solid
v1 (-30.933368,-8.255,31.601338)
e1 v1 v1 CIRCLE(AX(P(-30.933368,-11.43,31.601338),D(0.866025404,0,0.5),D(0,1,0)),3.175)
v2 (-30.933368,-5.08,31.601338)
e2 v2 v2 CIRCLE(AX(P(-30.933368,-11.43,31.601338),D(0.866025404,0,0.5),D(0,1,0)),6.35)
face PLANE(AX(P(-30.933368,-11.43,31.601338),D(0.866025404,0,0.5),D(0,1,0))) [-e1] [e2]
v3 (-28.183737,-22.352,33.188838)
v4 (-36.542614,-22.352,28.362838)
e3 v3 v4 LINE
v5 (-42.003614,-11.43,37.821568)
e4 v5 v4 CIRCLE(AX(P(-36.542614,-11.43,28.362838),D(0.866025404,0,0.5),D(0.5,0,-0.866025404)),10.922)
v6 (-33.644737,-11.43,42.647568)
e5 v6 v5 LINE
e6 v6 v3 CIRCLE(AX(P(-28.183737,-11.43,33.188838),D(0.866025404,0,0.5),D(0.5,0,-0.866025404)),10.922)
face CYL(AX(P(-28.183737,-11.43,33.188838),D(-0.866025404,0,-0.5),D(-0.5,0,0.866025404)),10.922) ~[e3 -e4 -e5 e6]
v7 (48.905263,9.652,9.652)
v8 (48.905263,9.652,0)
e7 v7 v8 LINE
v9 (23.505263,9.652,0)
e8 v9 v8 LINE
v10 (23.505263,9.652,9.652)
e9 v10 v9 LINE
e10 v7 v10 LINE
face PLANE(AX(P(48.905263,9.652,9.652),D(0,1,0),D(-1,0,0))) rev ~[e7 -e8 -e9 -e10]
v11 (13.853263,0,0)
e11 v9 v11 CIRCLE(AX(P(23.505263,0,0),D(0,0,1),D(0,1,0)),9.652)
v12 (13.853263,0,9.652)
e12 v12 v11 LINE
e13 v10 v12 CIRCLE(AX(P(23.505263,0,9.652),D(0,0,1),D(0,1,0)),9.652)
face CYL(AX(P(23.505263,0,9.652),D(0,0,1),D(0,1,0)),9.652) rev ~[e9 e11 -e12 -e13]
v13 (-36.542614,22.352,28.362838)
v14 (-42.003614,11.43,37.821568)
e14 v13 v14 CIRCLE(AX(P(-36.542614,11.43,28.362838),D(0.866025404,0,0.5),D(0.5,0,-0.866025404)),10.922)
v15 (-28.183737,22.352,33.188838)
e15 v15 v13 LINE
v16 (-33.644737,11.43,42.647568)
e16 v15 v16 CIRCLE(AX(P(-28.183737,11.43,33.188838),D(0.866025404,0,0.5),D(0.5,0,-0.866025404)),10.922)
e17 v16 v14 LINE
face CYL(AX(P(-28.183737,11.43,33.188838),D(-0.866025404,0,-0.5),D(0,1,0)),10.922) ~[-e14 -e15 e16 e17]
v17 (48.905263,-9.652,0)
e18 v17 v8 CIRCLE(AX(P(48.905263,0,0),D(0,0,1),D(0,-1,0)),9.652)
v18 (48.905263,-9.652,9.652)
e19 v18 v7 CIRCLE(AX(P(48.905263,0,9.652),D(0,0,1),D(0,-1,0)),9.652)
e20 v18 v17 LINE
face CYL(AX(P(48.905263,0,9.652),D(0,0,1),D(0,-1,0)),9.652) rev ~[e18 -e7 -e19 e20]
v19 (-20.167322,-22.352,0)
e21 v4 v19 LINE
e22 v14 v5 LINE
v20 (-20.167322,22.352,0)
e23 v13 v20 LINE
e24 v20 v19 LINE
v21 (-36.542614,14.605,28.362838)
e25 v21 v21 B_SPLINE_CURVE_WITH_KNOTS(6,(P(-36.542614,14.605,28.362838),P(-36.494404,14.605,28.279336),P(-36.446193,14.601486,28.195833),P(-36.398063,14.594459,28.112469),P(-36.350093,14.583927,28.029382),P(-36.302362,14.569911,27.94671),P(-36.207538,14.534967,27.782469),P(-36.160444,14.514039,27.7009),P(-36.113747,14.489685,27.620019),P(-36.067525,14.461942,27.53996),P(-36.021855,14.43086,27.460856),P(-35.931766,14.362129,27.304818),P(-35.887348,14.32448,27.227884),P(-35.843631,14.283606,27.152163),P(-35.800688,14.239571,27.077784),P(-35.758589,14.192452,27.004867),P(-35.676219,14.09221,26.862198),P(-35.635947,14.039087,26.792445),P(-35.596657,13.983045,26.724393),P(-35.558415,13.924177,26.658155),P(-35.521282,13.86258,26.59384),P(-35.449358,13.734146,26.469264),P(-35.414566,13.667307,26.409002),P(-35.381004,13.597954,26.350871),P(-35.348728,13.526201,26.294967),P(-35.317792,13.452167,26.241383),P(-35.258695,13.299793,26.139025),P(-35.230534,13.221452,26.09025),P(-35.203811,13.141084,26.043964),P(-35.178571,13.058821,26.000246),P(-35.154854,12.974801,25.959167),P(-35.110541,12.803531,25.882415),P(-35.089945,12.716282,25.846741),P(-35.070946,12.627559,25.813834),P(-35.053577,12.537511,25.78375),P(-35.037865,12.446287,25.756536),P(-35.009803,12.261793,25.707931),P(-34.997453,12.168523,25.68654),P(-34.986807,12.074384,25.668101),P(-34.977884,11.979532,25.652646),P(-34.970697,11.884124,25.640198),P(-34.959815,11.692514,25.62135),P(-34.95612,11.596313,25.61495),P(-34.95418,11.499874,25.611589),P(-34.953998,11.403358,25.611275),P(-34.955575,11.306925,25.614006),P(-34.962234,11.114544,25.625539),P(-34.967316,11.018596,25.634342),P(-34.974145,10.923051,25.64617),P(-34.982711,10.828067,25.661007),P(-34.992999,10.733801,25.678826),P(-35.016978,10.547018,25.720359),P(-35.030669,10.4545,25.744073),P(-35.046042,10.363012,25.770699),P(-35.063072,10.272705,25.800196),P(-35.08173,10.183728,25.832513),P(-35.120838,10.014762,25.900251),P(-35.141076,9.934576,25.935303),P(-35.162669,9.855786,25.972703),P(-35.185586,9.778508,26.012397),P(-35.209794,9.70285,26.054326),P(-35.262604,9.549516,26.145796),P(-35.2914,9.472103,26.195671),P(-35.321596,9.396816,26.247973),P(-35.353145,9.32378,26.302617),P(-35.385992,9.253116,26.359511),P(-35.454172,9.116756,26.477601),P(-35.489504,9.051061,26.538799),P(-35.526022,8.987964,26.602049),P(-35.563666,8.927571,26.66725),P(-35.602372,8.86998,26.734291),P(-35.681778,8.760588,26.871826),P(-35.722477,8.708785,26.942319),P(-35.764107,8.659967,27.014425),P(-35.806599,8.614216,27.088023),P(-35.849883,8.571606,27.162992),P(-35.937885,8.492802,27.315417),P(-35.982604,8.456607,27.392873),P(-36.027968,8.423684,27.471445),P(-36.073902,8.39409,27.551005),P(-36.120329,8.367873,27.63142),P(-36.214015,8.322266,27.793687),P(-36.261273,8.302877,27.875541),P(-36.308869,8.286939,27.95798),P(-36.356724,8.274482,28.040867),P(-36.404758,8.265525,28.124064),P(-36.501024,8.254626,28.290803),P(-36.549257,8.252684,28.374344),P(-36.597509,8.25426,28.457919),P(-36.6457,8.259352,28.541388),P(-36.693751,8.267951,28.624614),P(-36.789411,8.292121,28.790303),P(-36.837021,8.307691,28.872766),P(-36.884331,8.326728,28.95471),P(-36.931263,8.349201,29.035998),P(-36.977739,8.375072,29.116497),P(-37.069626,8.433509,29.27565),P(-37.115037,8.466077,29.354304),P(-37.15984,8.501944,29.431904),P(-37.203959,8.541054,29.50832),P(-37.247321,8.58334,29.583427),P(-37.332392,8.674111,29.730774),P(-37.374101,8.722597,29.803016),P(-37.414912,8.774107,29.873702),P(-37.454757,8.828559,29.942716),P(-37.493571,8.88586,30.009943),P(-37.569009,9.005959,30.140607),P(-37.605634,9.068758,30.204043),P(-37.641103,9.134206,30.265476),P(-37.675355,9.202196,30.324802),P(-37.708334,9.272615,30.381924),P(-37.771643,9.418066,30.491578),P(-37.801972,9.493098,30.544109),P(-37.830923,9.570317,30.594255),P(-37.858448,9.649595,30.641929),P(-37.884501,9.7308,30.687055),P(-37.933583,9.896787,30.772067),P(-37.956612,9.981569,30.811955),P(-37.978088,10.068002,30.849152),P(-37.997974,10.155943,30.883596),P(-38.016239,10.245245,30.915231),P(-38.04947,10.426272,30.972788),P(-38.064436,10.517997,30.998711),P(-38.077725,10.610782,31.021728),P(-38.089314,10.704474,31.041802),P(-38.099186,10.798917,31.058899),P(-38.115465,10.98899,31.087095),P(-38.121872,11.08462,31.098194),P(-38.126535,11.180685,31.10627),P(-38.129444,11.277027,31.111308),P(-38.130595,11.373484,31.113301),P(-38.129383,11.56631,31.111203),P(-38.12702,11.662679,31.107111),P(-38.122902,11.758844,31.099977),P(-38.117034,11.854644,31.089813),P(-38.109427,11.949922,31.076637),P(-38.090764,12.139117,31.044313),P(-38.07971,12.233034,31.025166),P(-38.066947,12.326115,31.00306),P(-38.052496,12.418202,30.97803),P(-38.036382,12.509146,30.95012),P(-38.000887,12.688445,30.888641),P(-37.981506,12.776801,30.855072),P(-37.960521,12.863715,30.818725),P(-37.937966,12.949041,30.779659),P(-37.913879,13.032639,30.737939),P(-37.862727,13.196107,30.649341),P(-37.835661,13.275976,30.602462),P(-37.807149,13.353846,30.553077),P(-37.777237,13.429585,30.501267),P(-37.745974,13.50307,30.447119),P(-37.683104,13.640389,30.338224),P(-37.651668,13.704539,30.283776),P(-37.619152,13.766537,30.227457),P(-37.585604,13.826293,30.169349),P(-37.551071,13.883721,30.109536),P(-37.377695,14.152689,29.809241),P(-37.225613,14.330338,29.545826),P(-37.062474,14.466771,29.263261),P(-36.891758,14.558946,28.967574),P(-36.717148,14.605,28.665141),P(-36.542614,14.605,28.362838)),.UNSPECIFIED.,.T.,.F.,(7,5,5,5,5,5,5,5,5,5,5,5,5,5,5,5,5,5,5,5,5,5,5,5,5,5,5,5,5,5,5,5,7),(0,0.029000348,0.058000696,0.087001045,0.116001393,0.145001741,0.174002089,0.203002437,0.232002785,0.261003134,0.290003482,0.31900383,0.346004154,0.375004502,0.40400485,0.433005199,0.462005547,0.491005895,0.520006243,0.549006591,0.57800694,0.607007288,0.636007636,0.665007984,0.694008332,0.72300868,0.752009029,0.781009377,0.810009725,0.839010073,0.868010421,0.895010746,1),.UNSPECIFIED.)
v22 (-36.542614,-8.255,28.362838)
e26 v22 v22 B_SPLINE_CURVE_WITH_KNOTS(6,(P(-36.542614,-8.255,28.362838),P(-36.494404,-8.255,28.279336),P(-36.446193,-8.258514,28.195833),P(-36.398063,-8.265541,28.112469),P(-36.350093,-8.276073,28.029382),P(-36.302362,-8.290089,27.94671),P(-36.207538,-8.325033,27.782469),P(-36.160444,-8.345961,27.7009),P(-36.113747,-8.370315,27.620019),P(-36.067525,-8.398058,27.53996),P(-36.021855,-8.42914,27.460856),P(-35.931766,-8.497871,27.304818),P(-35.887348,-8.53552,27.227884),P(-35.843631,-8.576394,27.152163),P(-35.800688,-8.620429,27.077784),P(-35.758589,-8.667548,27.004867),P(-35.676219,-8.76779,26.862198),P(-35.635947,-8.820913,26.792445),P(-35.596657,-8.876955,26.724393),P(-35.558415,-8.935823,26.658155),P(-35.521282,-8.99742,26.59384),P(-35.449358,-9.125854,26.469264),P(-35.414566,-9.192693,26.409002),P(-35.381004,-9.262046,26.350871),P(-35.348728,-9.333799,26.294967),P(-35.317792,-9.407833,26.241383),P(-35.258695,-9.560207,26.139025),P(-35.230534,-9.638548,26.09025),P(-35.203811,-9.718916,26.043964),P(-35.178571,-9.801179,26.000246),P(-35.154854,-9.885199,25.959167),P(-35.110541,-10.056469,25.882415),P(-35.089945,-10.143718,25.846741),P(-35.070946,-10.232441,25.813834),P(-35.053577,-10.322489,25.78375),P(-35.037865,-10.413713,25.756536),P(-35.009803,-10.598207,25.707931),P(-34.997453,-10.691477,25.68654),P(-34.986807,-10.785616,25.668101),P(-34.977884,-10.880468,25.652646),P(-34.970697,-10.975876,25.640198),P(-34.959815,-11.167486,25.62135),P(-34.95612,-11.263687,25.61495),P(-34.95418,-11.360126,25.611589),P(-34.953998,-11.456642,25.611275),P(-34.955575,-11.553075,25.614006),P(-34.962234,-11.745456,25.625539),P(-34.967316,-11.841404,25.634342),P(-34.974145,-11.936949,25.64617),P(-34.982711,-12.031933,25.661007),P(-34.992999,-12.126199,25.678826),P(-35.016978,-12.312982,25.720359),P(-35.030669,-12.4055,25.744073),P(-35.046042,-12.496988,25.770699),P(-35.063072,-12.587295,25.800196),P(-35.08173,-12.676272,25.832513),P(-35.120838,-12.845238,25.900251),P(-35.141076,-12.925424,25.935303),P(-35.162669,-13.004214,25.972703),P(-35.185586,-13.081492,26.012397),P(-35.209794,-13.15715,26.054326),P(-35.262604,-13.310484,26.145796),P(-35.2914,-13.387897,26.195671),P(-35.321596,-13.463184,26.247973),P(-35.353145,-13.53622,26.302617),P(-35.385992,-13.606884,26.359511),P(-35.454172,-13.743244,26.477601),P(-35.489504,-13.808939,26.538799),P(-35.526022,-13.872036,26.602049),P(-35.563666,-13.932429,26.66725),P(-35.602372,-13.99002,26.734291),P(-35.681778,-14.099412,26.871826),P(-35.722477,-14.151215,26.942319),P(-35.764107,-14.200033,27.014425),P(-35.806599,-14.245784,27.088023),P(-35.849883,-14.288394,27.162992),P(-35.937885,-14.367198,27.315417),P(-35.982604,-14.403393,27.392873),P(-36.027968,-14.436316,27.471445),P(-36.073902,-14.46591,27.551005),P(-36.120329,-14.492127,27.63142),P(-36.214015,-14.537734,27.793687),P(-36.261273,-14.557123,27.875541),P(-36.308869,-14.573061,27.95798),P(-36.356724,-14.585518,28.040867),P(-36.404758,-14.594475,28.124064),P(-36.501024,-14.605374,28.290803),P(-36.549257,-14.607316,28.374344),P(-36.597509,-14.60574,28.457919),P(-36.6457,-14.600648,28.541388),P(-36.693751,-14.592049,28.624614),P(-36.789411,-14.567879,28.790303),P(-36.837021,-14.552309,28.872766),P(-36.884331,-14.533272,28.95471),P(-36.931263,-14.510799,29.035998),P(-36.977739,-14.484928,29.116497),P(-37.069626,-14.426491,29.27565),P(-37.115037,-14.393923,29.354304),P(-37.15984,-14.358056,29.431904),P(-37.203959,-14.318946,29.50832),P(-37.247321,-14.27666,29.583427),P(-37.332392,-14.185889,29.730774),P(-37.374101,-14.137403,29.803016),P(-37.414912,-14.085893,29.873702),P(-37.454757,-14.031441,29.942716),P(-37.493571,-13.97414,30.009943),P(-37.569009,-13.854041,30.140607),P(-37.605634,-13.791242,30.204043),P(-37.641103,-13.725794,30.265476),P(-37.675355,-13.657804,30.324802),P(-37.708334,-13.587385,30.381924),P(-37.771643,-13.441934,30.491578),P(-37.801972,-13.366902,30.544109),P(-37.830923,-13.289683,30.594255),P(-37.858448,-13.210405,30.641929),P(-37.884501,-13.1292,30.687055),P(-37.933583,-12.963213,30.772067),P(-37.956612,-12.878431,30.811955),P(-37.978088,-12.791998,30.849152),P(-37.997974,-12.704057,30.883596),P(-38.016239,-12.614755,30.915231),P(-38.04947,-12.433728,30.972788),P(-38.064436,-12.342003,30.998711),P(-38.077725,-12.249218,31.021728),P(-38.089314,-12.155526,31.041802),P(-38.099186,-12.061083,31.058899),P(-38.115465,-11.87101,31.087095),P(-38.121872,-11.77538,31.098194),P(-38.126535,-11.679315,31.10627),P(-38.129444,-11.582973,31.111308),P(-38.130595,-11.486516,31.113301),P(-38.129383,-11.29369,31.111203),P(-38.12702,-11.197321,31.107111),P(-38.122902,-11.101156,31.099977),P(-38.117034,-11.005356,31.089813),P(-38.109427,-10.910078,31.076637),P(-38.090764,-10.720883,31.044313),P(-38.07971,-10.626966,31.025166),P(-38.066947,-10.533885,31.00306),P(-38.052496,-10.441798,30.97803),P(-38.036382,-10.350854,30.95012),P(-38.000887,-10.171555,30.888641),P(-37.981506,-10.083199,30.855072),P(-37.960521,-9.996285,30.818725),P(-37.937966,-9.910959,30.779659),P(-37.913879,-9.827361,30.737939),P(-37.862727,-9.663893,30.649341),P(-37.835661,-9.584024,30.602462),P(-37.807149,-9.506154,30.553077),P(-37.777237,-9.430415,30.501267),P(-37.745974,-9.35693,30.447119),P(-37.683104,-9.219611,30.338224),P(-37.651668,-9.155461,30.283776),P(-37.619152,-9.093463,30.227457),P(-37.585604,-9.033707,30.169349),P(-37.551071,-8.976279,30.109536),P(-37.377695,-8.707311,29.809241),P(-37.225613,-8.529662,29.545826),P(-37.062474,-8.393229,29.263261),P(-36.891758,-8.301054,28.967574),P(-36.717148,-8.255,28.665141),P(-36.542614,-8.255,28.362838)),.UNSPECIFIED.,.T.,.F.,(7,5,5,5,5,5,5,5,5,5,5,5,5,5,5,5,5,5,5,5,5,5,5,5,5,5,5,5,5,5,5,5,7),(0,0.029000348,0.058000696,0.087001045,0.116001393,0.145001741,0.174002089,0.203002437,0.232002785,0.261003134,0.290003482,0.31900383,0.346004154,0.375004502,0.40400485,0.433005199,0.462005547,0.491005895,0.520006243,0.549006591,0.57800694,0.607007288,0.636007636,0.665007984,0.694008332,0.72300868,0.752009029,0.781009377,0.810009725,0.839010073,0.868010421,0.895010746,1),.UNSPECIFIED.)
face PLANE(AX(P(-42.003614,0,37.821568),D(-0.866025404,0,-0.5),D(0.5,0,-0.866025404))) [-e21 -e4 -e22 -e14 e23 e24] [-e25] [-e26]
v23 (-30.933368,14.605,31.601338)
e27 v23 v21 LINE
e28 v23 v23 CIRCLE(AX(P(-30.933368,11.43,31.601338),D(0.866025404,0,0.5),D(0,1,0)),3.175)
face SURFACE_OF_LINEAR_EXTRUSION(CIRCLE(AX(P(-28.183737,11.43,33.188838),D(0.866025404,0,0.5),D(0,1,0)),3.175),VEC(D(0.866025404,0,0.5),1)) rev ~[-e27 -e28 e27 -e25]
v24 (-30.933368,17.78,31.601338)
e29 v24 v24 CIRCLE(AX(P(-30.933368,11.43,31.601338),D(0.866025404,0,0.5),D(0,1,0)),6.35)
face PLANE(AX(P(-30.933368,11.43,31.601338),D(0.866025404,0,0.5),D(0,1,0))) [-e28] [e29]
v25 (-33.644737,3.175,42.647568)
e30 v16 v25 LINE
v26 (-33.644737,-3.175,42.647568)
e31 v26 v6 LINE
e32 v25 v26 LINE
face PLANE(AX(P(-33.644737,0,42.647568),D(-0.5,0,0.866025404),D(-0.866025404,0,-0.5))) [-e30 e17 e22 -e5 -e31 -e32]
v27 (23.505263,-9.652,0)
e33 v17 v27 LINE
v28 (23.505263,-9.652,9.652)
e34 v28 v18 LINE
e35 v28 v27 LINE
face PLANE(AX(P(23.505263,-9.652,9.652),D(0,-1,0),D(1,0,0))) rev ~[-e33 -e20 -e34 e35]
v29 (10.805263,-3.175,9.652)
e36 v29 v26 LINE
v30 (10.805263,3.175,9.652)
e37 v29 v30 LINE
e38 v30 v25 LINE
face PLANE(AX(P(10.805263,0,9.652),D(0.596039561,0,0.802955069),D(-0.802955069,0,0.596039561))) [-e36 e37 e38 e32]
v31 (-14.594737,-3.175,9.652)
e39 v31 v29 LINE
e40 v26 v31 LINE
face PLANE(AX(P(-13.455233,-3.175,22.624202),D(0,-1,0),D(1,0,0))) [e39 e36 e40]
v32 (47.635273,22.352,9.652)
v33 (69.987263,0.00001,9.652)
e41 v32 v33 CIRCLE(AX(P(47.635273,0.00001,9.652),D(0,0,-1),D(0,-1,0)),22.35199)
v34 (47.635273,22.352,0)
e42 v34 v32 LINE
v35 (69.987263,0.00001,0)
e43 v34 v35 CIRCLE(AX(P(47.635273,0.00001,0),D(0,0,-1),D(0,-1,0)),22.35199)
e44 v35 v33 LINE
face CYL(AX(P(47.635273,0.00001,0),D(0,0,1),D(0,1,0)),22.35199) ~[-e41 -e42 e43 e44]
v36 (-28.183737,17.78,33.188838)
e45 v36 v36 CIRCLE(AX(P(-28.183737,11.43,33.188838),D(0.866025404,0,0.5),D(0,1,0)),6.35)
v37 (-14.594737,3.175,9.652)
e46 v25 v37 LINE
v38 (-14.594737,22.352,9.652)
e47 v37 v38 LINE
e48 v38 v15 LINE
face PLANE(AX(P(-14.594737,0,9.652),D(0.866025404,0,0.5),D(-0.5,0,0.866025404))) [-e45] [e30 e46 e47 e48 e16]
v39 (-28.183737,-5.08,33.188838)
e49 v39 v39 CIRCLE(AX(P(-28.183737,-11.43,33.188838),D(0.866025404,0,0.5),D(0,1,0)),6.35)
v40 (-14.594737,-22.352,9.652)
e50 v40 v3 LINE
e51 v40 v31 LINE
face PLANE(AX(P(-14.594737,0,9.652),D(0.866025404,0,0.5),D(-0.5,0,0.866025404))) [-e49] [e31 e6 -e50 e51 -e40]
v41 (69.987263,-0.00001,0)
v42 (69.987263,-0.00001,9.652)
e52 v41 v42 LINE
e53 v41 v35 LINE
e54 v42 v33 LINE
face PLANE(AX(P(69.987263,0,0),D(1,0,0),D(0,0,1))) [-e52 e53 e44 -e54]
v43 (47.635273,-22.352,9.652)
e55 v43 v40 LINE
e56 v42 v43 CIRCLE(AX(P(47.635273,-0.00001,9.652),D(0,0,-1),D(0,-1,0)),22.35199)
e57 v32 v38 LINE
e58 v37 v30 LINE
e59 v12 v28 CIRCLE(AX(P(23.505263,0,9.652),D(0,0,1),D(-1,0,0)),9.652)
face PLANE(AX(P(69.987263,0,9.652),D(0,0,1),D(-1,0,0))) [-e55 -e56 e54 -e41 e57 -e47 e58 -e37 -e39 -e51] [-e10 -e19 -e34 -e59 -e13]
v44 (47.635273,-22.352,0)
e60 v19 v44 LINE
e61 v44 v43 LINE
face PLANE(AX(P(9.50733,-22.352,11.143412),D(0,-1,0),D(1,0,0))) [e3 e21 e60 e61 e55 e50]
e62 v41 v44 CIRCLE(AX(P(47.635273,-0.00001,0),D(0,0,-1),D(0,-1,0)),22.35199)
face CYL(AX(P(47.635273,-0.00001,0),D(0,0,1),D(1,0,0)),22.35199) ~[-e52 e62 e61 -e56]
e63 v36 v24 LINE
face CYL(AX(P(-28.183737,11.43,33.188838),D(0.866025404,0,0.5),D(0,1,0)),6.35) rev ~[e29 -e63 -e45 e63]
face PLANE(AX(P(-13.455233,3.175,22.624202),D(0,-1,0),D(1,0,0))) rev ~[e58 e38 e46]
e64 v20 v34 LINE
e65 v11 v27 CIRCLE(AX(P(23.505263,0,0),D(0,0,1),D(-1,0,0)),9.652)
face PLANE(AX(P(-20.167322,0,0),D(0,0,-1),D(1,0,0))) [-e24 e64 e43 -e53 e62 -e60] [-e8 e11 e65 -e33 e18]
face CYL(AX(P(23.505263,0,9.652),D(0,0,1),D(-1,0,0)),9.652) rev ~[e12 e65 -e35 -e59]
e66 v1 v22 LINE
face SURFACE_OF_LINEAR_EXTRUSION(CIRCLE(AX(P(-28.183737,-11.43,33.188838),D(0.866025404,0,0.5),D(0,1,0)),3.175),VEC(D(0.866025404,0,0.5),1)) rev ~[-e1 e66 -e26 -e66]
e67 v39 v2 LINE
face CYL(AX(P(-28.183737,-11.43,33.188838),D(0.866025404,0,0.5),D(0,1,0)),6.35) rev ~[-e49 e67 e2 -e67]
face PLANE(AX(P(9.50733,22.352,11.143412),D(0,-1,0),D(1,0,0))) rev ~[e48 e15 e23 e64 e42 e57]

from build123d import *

# Parameters (mm, degrees)
F1_DEPTH  = 22.352
F2_DEPTH  = 3.175
F4_DEPTH  = 1143
F6_R      = 6.35
F6_R_2    = 3.175
F7_DEPTH  = 3.175
F8_R      = 6.35
F8_R_2    = 3.175
F9_DEPTH  = 3.175
F10_DEPTH = 28.5637839421
F11_R     = 10.922
F12_R     = 22.35199


# Not quite as in the source:
# - a fillet or chamfer is up to 0.001 mm smaller than in the source, because OpenCascade refuses the exact size


with BuildPart() as f1:
    # F0 (on Front) → F1 (new body, symmetric)
    with BuildSketch(Plane.XZ):
        Polygon((-14.5947370299, 9.652), (-33.6447370299, 42.6475678842), (-42.0036142272, 37.8215678842), (-20.1673218281, 0), (69.9872629701, 0), (69.9872629701, 9.652), (10.8052629701, 9.652), align=None)
    extrude(amount=F1_DEPTH, both=True)

    # F0 (on Front) → F2 (join, symmetric)
    with BuildSketch(Plane.XZ):
        Polygon((10.8052629701, 9.652), (-33.6447370299, 42.6475678842), (-14.5947370299, 9.652), align=None)
    extrude(amount=F2_DEPTH, both=True)

    # F3 (on face) → F4 (cut)
    with BuildSketch(Plane.XY.offset(9.652)):
        with BuildLine():
            ThreePointArc((23.5052629701, 9.652), (16.6802683181, 6.824994652), (13.8532629701, 0))
            Line((13.8532629701, 0), (23.5052629701, 0))
            Line((23.5052629701, 0), (26.5532629701, 0))
            ThreePointArc((26.5532629701, 0), (27.1079902762, 4.9488187589), (28.7446379798, 9.652))
            Line((28.7446379798, 9.652), (23.5052629701, 9.652))
        make_face()
        with BuildLine():
            Line((23.5052629701, 0), (13.8532629701, 0))
            ThreePointArc((13.8532629701, 0), (16.6802683181, -6.824994652), (23.5052629701, -9.652))
            Line((23.5052629701, -9.652), (28.7446379798, -9.652))
            ThreePointArc((28.7446379798, -9.652), (27.1079902762, -4.9488187589), (26.5532629701, 0))
            Line((26.5532629701, 0), (23.5052629701, 0))
        make_face()
        with BuildLine():
            ThreePointArc((28.7446379798, 9.652), (27.1079902762, 4.9488187589), (26.5532629701, 0))
            ThreePointArc((26.5532629701, 0), (27.1079902762, -4.9488187589), (28.7446379798, -9.652))
            Line((28.7446379798, -9.652), (48.9052629701, -9.652))
            ThreePointArc((48.9052629701, -9.652), (58.5572629701, 0), (48.9052629701, 9.652))
            Line((48.9052629701, 9.652), (28.7446379798, 9.652))
        make_face()
    extrude(amount=-F4_DEPTH, mode=Mode.SUBTRACT)

    # F6 (on face) → F7 (cut)
    with BuildSketch(Plane(origin=(-6.7666141738, 0, -3.9067065147), x_dir=(0, 1, 0), z_dir=(0.8660254038, 0, 0.5))):
        with Locations((11.43, 42.8342457123)):
            Circle(F6_R)
        with Locations((11.43, 42.8342457123)):
            Circle(F6_R_2, mode=Mode.SUBTRACT)
    extrude(amount=-F7_DEPTH, mode=Mode.SUBTRACT)

    # F8 (on face) → F9 (cut)
    with BuildSketch(Plane(origin=(-6.7666141738, 0, -3.9067065147), x_dir=(0, 1, 0), z_dir=(0.8660254038, 0, 0.5))):
        with Locations((-11.43, 42.8342457123)):
            Circle(F8_R)
        with Locations((-11.43, 42.8342457123)):
            Circle(F8_R_2, mode=Mode.SUBTRACT)
    extrude(amount=-F9_DEPTH, mode=Mode.SUBTRACT)

    # F10 (cut, through all): faces of the model
    f10_faces = [f1.faces().sort_by_distance(p)[0] for p in [
        (-28.1837370299, -11.43, 33.1888384241),
        (-28.1837370299, 11.43, 33.1888384241),
    ]]
    extrude(f10_faces, amount=-F10_DEPTH, mode=Mode.SUBTRACT)

    # F11
    f11_edges = [f1.edges().sort_by_distance(p)[0] for p in [
        (-37.824176, -22.352, 40.234568),
        (-37.824176, 22.352, 40.234568),
    ]]
    fillet(f11_edges, radius=F11_R)

    # F12 (radius 22.352 in the source; OpenCascade refuses exactly that, so slightly less here)
    f12_edges = [f1.edges().sort_by_distance(p)[0] for p in [
        (69.987263, 22.352, 4.826),
        (69.987263, -22.352, 4.826),
    ]]
    fillet(f12_edges, radius=F12_R)


solid = f1.part
